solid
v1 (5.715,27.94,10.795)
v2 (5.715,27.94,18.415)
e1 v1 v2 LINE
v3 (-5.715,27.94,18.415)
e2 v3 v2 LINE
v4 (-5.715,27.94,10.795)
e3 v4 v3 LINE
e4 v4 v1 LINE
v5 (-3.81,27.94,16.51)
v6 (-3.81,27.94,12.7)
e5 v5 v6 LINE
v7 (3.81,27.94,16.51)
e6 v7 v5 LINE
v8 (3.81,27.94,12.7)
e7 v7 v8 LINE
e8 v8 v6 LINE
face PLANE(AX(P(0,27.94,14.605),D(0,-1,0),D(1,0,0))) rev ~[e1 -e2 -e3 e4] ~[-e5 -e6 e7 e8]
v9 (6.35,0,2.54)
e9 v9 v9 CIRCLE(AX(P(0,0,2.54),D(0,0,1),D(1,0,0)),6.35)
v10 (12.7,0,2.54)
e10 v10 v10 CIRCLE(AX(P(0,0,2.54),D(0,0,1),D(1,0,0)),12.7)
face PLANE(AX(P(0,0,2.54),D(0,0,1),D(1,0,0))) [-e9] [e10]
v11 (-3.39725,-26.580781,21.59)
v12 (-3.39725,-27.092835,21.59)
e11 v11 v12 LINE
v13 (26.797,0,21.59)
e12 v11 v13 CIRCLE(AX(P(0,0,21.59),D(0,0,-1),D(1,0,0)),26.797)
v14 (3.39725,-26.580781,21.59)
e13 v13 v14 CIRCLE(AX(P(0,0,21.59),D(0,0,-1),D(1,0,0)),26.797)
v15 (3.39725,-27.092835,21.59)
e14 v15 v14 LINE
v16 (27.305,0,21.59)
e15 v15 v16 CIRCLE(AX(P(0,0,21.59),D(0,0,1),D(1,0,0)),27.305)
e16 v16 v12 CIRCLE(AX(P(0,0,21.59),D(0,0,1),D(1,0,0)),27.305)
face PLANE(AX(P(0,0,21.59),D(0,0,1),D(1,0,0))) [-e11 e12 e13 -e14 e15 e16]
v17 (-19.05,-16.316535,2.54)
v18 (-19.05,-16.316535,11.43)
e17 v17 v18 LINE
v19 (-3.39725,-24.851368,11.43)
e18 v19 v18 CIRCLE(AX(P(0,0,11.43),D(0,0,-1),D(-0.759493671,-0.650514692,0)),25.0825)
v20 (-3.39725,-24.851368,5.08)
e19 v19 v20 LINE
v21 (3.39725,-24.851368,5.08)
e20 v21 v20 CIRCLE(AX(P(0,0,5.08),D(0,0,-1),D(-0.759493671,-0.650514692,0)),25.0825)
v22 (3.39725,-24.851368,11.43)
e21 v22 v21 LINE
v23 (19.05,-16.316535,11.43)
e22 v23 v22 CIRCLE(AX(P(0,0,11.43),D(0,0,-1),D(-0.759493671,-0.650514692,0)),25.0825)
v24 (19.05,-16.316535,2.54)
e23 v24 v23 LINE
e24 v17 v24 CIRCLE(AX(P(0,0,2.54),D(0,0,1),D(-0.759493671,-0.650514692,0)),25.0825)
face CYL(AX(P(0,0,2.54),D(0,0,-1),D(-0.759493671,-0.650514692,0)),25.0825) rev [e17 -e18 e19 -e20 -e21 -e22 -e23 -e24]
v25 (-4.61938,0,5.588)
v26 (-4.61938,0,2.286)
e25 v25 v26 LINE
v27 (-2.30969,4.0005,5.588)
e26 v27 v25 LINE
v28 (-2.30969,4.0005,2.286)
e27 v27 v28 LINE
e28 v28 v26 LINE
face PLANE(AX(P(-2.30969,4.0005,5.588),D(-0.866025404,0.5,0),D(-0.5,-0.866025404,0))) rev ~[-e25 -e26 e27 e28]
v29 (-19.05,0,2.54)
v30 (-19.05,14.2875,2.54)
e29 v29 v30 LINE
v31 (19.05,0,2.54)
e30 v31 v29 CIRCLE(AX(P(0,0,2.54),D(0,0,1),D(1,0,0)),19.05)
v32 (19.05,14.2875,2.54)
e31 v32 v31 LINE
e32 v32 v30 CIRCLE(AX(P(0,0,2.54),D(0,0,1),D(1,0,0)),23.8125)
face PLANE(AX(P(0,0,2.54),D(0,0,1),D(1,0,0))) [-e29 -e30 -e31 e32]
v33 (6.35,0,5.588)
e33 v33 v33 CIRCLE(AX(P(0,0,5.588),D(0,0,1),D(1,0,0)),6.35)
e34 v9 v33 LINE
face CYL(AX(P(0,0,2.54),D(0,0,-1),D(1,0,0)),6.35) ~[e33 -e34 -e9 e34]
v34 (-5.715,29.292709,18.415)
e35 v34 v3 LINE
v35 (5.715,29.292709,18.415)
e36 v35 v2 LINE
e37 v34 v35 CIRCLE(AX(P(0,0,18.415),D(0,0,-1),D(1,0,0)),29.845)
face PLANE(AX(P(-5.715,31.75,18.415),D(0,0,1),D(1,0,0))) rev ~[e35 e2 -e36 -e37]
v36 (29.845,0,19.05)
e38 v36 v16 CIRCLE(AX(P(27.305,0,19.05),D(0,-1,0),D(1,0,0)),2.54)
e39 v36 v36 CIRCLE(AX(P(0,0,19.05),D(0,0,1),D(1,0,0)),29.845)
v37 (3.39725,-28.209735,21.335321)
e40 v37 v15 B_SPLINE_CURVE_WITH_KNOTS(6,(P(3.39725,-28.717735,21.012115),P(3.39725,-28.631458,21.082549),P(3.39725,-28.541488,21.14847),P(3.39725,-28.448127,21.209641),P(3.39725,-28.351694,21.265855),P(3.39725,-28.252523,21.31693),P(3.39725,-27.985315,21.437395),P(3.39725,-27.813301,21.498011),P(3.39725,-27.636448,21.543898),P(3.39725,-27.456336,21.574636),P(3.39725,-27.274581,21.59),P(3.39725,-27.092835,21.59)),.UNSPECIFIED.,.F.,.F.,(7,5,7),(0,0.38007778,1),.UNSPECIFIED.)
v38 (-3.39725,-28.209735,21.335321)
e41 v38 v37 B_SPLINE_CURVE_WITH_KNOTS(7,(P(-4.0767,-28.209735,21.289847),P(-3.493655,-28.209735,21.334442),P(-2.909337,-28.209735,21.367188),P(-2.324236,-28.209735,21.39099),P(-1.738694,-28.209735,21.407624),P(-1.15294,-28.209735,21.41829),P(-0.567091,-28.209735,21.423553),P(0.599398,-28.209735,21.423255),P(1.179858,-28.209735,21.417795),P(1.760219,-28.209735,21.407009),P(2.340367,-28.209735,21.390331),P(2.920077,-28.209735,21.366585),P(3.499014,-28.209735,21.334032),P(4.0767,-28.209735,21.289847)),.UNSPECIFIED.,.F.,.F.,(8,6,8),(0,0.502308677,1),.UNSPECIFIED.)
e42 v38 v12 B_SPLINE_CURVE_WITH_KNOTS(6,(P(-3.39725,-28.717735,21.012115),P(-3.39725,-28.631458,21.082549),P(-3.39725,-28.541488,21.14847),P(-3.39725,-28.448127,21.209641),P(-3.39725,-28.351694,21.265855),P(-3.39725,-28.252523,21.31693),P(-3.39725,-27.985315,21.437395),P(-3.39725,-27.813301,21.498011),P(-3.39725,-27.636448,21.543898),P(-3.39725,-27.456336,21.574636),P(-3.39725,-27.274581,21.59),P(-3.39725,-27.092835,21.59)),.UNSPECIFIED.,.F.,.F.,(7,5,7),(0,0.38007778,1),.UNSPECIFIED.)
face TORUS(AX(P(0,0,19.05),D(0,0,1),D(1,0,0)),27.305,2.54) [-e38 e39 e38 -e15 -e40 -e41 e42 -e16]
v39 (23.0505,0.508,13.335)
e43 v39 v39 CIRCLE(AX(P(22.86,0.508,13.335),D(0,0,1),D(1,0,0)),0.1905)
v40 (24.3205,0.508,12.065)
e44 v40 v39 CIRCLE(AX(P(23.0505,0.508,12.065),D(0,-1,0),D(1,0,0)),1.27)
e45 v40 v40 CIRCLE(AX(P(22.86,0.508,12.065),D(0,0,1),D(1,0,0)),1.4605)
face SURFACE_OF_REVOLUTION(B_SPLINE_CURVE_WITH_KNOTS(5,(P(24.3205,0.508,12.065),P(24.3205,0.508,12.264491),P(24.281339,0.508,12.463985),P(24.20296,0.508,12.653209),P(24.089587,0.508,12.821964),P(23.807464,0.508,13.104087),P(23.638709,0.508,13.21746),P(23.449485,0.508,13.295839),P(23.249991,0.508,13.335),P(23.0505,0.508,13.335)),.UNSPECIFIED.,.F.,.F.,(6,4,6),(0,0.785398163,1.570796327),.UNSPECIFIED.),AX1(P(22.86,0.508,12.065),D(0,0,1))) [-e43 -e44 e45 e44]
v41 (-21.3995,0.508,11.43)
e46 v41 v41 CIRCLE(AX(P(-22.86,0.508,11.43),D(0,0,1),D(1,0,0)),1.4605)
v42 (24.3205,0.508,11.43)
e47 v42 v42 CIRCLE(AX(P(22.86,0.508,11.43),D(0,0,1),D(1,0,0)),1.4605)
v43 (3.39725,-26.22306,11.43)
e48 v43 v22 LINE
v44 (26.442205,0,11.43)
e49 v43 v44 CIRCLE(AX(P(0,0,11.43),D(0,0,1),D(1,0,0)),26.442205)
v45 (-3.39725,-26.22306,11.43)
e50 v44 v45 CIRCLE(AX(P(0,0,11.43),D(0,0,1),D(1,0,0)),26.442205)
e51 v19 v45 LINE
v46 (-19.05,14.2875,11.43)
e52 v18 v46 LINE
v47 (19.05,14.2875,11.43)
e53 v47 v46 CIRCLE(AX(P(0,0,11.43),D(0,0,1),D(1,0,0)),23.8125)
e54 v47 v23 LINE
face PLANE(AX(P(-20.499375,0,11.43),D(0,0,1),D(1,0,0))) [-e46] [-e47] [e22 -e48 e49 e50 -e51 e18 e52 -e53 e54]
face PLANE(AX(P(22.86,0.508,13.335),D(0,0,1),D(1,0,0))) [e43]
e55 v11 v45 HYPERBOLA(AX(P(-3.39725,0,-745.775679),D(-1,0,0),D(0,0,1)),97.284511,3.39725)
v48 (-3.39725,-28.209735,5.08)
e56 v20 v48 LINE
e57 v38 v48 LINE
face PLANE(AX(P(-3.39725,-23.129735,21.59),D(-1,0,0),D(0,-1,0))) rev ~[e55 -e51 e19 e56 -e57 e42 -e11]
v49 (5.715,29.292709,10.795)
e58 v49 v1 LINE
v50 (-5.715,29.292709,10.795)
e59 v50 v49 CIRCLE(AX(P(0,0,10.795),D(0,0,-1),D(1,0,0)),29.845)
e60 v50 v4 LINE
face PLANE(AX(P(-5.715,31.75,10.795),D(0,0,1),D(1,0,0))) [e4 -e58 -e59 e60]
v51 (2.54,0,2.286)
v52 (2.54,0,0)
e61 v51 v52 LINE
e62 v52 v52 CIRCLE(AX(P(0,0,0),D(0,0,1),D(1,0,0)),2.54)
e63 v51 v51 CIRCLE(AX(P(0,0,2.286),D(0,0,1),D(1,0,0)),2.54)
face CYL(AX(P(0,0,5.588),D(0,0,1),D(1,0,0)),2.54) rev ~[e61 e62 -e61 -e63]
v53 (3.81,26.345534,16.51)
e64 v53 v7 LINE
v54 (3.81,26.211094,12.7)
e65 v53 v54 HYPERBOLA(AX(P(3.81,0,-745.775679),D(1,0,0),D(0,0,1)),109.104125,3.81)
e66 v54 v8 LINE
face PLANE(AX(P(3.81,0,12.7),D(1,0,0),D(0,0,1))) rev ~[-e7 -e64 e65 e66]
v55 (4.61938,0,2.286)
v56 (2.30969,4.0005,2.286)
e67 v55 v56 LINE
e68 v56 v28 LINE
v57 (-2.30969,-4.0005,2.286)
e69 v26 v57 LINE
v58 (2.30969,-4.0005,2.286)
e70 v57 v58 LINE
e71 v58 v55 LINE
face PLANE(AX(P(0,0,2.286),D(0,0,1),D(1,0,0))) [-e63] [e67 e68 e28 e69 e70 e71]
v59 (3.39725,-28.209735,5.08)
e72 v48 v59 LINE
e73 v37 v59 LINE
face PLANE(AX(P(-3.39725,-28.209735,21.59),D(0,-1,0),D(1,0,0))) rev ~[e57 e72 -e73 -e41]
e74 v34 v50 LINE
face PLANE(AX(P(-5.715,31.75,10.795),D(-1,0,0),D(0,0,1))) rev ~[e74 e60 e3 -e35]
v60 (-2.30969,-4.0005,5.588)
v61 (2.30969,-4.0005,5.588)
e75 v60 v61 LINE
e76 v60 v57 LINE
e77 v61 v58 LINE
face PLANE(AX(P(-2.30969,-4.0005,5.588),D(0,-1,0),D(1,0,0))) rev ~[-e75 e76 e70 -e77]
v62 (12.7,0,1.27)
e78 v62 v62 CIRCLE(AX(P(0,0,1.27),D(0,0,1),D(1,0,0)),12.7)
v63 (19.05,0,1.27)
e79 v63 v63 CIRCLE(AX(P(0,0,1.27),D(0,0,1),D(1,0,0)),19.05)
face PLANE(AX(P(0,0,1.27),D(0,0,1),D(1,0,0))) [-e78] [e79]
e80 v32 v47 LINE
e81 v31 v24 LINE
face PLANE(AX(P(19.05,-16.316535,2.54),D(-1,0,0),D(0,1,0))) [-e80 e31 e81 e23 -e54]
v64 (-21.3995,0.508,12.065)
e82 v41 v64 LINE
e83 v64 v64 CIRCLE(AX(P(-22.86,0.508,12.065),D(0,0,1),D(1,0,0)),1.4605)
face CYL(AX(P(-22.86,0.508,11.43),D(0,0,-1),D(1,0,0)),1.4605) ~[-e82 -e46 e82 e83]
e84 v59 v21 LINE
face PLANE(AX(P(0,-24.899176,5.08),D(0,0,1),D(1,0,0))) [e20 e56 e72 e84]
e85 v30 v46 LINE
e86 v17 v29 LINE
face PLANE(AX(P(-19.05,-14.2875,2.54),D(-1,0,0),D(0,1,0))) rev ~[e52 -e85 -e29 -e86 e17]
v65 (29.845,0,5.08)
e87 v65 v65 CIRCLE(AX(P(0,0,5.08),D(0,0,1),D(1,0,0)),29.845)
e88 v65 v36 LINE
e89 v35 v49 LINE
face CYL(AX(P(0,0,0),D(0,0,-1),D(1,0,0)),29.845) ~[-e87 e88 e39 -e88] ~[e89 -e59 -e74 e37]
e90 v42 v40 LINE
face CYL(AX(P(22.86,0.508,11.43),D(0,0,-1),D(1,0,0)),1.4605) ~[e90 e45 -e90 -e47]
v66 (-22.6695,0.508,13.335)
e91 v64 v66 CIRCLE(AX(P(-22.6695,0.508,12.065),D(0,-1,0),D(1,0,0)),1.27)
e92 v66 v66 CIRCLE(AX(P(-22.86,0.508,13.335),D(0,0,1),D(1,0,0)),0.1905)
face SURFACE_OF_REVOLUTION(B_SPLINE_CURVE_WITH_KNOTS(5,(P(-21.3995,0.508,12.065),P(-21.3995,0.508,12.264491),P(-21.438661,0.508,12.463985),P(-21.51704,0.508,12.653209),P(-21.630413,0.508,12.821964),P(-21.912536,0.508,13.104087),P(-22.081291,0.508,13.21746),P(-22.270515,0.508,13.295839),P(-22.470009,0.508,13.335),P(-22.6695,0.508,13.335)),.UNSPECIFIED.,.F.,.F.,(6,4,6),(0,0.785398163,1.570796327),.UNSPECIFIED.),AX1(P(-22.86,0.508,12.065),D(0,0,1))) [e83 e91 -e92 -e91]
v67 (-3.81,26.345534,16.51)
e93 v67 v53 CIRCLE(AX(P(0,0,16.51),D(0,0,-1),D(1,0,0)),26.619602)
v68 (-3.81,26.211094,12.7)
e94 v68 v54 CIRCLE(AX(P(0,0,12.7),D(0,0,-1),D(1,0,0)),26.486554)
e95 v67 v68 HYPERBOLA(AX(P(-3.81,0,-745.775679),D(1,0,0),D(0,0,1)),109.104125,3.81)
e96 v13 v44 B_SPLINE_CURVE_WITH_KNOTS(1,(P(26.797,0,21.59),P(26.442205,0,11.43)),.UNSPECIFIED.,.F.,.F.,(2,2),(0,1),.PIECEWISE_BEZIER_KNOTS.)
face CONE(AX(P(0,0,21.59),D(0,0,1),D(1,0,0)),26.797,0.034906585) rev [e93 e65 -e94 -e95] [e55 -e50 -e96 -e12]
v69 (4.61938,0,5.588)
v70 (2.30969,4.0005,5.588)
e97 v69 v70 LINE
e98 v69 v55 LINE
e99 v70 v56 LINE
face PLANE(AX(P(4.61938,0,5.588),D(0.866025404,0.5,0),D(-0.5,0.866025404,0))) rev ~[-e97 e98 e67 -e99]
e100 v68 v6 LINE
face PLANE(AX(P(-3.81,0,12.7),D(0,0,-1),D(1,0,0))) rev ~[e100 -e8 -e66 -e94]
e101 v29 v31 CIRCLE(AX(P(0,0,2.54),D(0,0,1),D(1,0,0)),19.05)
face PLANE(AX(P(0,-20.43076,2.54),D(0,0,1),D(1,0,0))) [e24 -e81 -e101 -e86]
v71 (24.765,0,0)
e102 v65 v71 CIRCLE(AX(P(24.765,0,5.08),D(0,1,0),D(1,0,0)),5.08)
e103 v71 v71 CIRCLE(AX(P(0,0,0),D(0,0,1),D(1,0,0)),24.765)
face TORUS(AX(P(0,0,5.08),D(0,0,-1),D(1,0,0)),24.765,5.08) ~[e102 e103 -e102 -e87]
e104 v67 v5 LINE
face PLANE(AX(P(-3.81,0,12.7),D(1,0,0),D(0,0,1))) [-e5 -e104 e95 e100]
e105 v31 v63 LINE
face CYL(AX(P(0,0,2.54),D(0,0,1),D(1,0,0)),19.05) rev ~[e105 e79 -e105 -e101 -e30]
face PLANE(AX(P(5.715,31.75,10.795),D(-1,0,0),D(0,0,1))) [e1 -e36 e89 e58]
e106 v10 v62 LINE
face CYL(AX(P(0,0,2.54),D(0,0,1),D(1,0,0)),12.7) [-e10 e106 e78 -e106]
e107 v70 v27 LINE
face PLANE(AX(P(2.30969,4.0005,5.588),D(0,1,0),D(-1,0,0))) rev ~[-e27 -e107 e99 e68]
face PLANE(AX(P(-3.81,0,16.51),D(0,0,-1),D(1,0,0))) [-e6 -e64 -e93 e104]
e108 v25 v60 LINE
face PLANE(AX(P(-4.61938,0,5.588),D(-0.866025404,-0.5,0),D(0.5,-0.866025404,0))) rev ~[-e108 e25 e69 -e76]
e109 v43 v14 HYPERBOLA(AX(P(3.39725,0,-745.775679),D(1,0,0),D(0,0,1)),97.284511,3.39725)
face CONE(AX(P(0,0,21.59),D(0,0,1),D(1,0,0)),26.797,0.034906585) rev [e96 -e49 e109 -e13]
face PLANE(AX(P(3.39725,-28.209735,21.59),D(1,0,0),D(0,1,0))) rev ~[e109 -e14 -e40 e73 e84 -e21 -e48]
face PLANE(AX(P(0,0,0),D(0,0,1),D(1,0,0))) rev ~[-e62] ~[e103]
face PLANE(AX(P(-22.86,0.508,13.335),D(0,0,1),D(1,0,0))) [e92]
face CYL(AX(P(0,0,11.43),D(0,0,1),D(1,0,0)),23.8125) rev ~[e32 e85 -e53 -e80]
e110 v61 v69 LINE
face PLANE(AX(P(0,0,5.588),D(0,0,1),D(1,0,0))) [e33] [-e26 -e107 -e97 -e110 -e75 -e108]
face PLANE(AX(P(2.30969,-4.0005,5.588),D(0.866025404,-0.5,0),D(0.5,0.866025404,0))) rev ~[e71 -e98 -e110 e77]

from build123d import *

# Parameters (mm, degrees)
F0_R      = 29.845
F1_DEPTH  = 21.59
F2_R      = 26.797
F3_DEPTH  = 10.16
F3_TAPER  = 2
F4_R      = 23.8125
F5_DEPTH  = 8.89
F6_R      = 6.35
F7_DEPTH  = 3.048
F8_R      = 2.54
F9_DEPTH  = 25.4
F12_DEPTH = 3.302
F13_R     = 5.08
F14_R     = 2.54
F15_R     = 19.05
F15_R_2   = 12.7
F16_DEPTH = 1.27
F18_DEPTH = 8.89
F19_R     = 1.4605
F20_DEPTH = 1.905
F21_R     = 1.27
F22_W     = 7.62
F22_H     = 3.81
F23_DEPTH = 36.576
F25_DEPTH = 16.51
F27_DEPTH = 19.0510001
F29_W     = 11.43
F29_H     = 7.62
F30_DEPTH = 3.81


with BuildPart() as f1:
    # F0 (on Top) → F1 (new body)
    with BuildSketch(Plane.XY):
        Circle(F0_R)
    extrude(amount=F1_DEPTH)

    # F2 (on face) → F3 (cut)
    with BuildSketch(Plane.XY.offset(21.59)):
        Circle(F2_R)
    extrude(amount=-F3_DEPTH, taper=F3_TAPER, mode=Mode.SUBTRACT)

    # F4 (on face) → F5 (cut)
    with BuildSketch(Plane.XY.offset(11.43)):
        Circle(F4_R)
    extrude(amount=-F5_DEPTH, mode=Mode.SUBTRACT)

    # F6 (on face) → F7 (join)
    with BuildSketch(Plane.XY.offset(2.54)):
        Circle(F6_R)
    extrude(amount=F7_DEPTH)

    # F8 (on face) → F9 (cut)
    with BuildSketch(Plane.XY.offset(5.588)):
        Circle(F8_R)
    extrude(amount=-F9_DEPTH, mode=Mode.SUBTRACT)

    # F11 (on offset) → F12 (cut)
    with BuildSketch(Plane.XY.offset(5.588)):
        Polygon((-2.3096897519, -4.0005), (2.3096897519, -4.0005), (4.6193795038, 0), (2.3096897519, 4.0005), (-2.3096897519, 4.0005), (-4.6193795038, 0), align=None)
    extrude(amount=-F12_DEPTH, mode=Mode.SUBTRACT)

    # F13
    f13_edges = [f1.edges().sort_by_distance(p)[0] for p in [
        (-29.845, 0, 0),
    ]]
    fillet(f13_edges, radius=F13_R)

    # F14
    f14_edges = [f1.edges().sort_by_distance(p)[0] for p in [
        (-29.845, 0, 21.59),
    ]]
    fillet(f14_edges, radius=F14_R)

    # F15 (on face) → F16 (cut)
    with BuildSketch(Plane.XY.offset(2.54)):
        Circle(F15_R)
        Circle(F15_R_2, mode=Mode.SUBTRACT)
    extrude(amount=-F16_DEPTH, mode=Mode.SUBTRACT)

    # F17 (on face) → F18 (join, through all)
    with BuildSketch(Plane.XY.offset(2.54)):
        with BuildLine():
            Line((-19.05, 0), (-19.05, 14.2875))
            ThreePointArc((-19.05, 14.2875), (-23.8125, 0), (-19.05, -14.2875))
            Line((-19.05, -14.2875), (-19.05, 0))
        make_face()
        with BuildLine():
            ThreePointArc((23.8125, 0), (22.5905210348, 7.5301736783), (19.05, 14.2875))
            Line((19.05, 14.2875), (19.05, 0))
            Line((19.05, 0), (19.05, -14.2875))
            ThreePointArc((19.05, -14.2875), (22.5905210348, -7.5301736783), (23.8125, 0))
        make_face()
    extrude(amount=F18_DEPTH)

    # F19 (on face) → F20 (join)
    with BuildSketch(Plane.XY.offset(11.43)):
        with Locations((-22.86, 0.508)):
            Circle(F19_R)
        with Locations((22.86, 0.508)):
            Circle(F19_R)
    extrude(amount=F20_DEPTH)

    # F21
    f21_edges = [f1.edges().sort_by_distance(p)[0] for p in [
        (-24.3205, 0.508, 13.335),
        (21.3995, 0.508, 13.335),
    ]]
    fillet(f21_edges, radius=F21_R)

    # F22 (on Front) → F23 (cut)
    with BuildSketch(Plane.XZ):
        with Locations((0, 14.605)):
            Rectangle(F22_W, F22_H)
    extrude(amount=-F23_DEPTH, mode=Mode.SUBTRACT)

    # F24 (on face) → F25 (cut)
    with BuildSketch(Plane.XY.offset(21.59)):
        with BuildLine():
            ThreePointArc((-3.39725, -26.5807806777), (0, -26.797), (3.39725, -26.5807806777))
            Line((3.39725, -26.5807806777), (3.39725, -23.129734925))
            Line((3.39725, -23.129734925), (-3.39725, -23.129734925))
            Line((-3.39725, -23.129734925), (-3.39725, -26.5807806777))
        make_face()
        with BuildLine():
            Line((-3.39725, -28.209734925), (3.39725, -28.209734925))
            Line((3.39725, -28.209734925), (3.39725, -27.0928351679))
            ThreePointArc((3.39725, -27.0928351679), (0, -27.305), (-3.39725, -27.0928351679))
            Line((-3.39725, -27.0928351679), (-3.39725, -28.209734925))
        make_face()
        with BuildLine():
            ThreePointArc((-3.39725, -27.0928351679), (0, -27.305), (3.39725, -27.0928351679))
            Line((3.39725, -27.0928351679), (3.39725, -26.5807806777))
            ThreePointArc((3.39725, -26.5807806777), (0, -26.797), (-3.39725, -26.5807806777))
            Line((-3.39725, -26.5807806777), (-3.39725, -27.0928351679))
        make_face()
    extrude(amount=-F25_DEPTH, mode=Mode.SUBTRACT)

    # F26 (on face) → F27 (cut, through all)
    with BuildSketch(Plane.XY.offset(2.54)):
        with BuildLine():
            ThreePointArc((19.05, -14.2875), (0, -23.8125), (-19.05, -14.2875))
            Line((-19.05, -14.2875), (-19.05, -16.3165347501))
            ThreePointArc((-19.05, -16.3165347501), (0, -25.0825), (19.05, -16.3165347501))
            Line((19.05, -16.3165347501), (19.05, -14.2875))
        make_face()
    extrude(amount=F27_DEPTH, mode=Mode.SUBTRACT)

    # F29 (on offset) → F30 (cut)
    with BuildSketch(Plane.XZ.offset(-31.75)):
        with Locations((0, 14.605)):
            Rectangle(F29_W, F29_H)
    extrude(amount=F30_DEPTH, mode=Mode.SUBTRACT)


solid = f1.part
